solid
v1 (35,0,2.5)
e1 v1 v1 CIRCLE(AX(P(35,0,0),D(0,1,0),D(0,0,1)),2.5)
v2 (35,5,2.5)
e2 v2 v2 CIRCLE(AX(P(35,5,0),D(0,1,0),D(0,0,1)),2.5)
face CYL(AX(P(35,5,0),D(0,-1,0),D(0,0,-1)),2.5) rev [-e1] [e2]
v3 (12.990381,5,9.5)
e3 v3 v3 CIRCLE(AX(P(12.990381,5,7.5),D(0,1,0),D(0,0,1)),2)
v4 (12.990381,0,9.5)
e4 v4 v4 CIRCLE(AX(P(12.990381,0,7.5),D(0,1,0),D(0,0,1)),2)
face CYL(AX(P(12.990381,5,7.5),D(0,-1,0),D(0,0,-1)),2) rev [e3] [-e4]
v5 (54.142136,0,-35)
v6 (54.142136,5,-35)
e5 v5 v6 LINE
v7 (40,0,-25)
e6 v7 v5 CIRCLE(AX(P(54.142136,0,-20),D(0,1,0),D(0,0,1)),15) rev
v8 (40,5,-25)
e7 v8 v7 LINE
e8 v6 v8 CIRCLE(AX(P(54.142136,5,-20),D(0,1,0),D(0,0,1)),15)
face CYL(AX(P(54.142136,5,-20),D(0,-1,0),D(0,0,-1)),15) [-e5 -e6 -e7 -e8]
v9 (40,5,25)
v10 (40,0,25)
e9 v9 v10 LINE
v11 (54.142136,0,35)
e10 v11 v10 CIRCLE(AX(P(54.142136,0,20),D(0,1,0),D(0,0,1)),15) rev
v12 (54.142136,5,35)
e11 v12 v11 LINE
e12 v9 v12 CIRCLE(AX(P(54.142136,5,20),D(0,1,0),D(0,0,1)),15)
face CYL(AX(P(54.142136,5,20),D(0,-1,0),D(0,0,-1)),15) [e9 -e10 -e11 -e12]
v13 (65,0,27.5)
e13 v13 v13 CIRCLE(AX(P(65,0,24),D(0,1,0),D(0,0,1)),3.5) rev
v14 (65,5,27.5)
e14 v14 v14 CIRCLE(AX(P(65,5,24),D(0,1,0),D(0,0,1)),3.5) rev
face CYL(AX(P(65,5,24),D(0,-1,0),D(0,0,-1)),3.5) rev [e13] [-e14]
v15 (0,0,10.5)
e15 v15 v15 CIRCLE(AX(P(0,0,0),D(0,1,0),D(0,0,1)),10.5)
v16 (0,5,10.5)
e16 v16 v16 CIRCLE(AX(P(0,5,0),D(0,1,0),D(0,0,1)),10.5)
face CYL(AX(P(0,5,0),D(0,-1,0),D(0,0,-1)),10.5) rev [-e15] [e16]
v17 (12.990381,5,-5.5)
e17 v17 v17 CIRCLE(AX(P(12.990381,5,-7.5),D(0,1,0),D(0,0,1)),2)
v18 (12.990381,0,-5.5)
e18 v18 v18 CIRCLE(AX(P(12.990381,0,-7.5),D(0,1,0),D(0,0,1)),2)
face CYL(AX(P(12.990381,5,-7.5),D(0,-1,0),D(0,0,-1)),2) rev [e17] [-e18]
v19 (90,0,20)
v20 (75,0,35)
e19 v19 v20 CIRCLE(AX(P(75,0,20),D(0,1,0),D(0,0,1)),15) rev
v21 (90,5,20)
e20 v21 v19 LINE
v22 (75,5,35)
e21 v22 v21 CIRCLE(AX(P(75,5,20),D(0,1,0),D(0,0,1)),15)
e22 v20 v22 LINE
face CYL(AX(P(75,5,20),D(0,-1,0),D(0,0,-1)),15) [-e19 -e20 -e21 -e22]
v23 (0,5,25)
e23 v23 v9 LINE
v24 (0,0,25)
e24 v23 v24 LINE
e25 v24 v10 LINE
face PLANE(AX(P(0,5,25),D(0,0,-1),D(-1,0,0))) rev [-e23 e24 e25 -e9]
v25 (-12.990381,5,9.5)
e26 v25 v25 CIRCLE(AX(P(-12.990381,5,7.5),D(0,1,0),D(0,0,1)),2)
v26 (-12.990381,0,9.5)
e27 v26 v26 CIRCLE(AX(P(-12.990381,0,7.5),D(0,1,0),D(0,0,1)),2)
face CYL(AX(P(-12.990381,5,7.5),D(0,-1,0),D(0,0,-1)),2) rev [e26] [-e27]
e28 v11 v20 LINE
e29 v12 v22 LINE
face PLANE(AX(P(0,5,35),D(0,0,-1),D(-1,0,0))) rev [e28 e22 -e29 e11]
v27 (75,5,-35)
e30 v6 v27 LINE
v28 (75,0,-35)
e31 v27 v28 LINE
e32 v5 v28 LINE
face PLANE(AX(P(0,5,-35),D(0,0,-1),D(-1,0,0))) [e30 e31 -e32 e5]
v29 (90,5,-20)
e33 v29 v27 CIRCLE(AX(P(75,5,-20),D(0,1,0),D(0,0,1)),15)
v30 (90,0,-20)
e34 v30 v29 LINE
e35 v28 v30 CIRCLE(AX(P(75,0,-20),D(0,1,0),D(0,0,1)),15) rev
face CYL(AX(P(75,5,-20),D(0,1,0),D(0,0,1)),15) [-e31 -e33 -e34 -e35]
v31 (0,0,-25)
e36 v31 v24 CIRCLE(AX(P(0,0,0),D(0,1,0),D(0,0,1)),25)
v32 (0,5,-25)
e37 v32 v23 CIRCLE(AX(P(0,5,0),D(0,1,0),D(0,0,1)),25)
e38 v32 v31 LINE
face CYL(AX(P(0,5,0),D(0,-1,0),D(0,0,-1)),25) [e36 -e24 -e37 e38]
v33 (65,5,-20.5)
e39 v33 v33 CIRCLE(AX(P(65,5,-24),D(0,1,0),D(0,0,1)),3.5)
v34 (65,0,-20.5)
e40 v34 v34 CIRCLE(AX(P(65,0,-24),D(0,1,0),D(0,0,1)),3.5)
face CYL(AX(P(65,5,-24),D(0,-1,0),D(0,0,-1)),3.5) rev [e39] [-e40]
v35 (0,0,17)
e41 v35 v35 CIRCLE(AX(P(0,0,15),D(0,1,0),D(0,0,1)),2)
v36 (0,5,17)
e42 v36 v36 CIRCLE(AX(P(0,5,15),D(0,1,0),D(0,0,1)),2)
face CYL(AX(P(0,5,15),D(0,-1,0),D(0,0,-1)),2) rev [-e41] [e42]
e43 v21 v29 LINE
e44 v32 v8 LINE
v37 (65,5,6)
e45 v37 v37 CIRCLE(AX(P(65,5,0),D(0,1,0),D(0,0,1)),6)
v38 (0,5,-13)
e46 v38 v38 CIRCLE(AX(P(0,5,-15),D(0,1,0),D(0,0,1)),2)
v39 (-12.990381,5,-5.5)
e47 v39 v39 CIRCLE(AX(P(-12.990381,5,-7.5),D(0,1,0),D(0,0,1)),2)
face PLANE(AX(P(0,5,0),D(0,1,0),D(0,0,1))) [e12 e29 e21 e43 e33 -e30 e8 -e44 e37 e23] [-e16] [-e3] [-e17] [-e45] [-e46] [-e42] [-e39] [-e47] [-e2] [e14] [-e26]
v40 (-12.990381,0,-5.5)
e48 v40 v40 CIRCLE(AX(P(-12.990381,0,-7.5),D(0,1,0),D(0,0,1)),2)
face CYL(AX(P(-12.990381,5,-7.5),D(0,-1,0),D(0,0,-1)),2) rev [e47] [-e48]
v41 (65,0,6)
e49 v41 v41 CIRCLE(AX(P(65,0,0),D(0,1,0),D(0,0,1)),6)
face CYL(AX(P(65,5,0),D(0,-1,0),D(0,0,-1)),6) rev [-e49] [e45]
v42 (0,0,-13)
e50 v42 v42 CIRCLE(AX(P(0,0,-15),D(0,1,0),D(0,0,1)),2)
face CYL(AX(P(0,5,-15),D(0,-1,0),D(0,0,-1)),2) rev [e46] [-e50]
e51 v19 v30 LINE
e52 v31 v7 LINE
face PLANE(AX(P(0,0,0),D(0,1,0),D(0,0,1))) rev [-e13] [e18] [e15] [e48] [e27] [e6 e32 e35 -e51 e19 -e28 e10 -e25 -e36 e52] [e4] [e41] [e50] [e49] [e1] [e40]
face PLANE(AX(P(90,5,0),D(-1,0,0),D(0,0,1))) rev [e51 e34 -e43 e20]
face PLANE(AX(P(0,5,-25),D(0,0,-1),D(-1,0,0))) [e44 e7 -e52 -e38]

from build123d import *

# Parameters (mm, degrees)
SKETCH1_R           = 3.5
SKETCH1_R_2         = 6
SKETCH1_R_3         = 2.5
SKETCH1_R_4         = 2
SKETCH1_R_5         = 10.5
BOSS_EXTRUDE1_DEPTH = 5
FILLET2_R           = 15


with BuildPart() as part:
    # Sketch1 → Boss-Extrude1 (new body)
    with BuildSketch(Plane(origin=(0, 0, 0), x_dir=(1, 0, 0), z_dir=(0, 1, 0))):
        with BuildLine():
            Line((40, -25), (40, -35))
            Line((40, -35), (90, -35))
            Line((90, -35), (90, 35))
            Line((90, 35), (40, 35))
            Line((40, 35), (40, 25))
            Line((40, 25), (0, 25))
            ThreePointArc((0, 25), (-25, 0), (0, -25))
            Line((0, -25), (40, -25))
        make_face()
        with Locations(Location((65, 24, 0), (0, 0, 270))):
            Circle(SKETCH1_R, mode=Mode.SUBTRACT)
        with Locations(Location((65, -24, 0), (0, 0, 270))):
            Circle(SKETCH1_R, mode=Mode.SUBTRACT)
        with Locations(Location((65, 0, 0), (0, 0, 270))):
            Circle(SKETCH1_R_2, mode=Mode.SUBTRACT)
        with Locations(Location((35, 0, 0), (0, 0, 270))):
            Circle(SKETCH1_R_3, mode=Mode.SUBTRACT)
        with Locations(Location((0, -15, 0), (0, 0, 270))):
            Circle(SKETCH1_R_4, mode=Mode.SUBTRACT)
        with Locations(Location((-12.990381057, -7.5, 0), (0, 0, 270))):
            Circle(SKETCH1_R_4, mode=Mode.SUBTRACT)
        with Locations(Location((12.990381057, -7.5, 0), (0, 0, 270))):
            Circle(SKETCH1_R_4, mode=Mode.SUBTRACT)
        with Locations(Location((-12.990381057, 7.5, 0), (0, 0, 270))):
            Circle(SKETCH1_R_4, mode=Mode.SUBTRACT)
        with Locations(Location((0, 0, 0), (0, 0, 270))):
            Circle(SKETCH1_R_5, mode=Mode.SUBTRACT)
        with Locations(Location((0, 15, 0), (0, 0, 270))):
            Circle(SKETCH1_R_4, mode=Mode.SUBTRACT)
        with Locations(Location((12.990381057, 7.5, 0), (0, 0, 270))):
            Circle(SKETCH1_R_4, mode=Mode.SUBTRACT)
    extrude(amount=BOSS_EXTRUDE1_DEPTH)

    # Fillet2
    # the kernel refuses this fillet: 15 mm, written as the material it takes off along each edge
    with BuildSketch(Plane(origin=(40, -35.355339059, -35), x_dir=(1, 0, 0), z_dir=(0, 1, 0))) as fillet2_piece_1:
        with BuildLine():
            CenterArc((14.142135624, -15), FILLET2_R, 90, 70.528779366)
            Line((0, -10), (-0.282842712, -9.9))
            ThreePointArc((-0.282842712, -9.9), (-0.3, -5), (-0.3, 0))
            Line((-0.3, 0), (0, 0.3))
            Line((0, 0.3), (14.142135624, 0.3))
            Line((14.142135624, 0.3), (14.142135624, 0))
        make_face()
    extrude(amount=75.710678119, mode=Mode.SUBTRACT)
    with BuildSketch(Plane(origin=(90, -37.5, 35), x_dir=(-1, 0, 0), z_dir=(0, 1, 0)), Plane(origin=(90, -37.5, -35), x_dir=(0, 0, 1), z_dir=(0, 1, 0))) as fillet2_piece_2:
        with BuildLine():
            CenterArc((FILLET2_R, -FILLET2_R), FILLET2_R, 90, 90)
            Line((0, -FILLET2_R), (-FILLET2_R * 0.02, -FILLET2_R))
            Line((-FILLET2_R * 0.02, -FILLET2_R), (-FILLET2_R * 0.02, FILLET2_R * 0.02))
            Line((-FILLET2_R * 0.02, FILLET2_R * 0.02), (FILLET2_R, FILLET2_R * 0.02))
            Line((FILLET2_R, FILLET2_R * 0.02), (FILLET2_R, 0))
        make_face()
    extrude(amount=80, mode=Mode.SUBTRACT)
    with BuildSketch(Plane(origin=(40, -35.355339059, 35), x_dir=(0, 0, -1), z_dir=(0, 1, 0))) as fillet2_piece_3:
        with BuildLine():
            CenterArc((15, -14.142135624), FILLET2_R, 109.471220634, 70.528779366)
            Line((0, -14.142135624), (-0.3, -14.142135624))
            Line((-0.3, -14.142135624), (-0.3, 0))
            Line((-0.3, 0), (0, 0.3))
            ThreePointArc((0, 0.3), (5, 0.3), (9.9, 0.282842712))
            Line((9.9, 0.282842712), (10, 0))
        make_face()
    extrude(amount=75.710678119, mode=Mode.SUBTRACT)


solid = part.part
